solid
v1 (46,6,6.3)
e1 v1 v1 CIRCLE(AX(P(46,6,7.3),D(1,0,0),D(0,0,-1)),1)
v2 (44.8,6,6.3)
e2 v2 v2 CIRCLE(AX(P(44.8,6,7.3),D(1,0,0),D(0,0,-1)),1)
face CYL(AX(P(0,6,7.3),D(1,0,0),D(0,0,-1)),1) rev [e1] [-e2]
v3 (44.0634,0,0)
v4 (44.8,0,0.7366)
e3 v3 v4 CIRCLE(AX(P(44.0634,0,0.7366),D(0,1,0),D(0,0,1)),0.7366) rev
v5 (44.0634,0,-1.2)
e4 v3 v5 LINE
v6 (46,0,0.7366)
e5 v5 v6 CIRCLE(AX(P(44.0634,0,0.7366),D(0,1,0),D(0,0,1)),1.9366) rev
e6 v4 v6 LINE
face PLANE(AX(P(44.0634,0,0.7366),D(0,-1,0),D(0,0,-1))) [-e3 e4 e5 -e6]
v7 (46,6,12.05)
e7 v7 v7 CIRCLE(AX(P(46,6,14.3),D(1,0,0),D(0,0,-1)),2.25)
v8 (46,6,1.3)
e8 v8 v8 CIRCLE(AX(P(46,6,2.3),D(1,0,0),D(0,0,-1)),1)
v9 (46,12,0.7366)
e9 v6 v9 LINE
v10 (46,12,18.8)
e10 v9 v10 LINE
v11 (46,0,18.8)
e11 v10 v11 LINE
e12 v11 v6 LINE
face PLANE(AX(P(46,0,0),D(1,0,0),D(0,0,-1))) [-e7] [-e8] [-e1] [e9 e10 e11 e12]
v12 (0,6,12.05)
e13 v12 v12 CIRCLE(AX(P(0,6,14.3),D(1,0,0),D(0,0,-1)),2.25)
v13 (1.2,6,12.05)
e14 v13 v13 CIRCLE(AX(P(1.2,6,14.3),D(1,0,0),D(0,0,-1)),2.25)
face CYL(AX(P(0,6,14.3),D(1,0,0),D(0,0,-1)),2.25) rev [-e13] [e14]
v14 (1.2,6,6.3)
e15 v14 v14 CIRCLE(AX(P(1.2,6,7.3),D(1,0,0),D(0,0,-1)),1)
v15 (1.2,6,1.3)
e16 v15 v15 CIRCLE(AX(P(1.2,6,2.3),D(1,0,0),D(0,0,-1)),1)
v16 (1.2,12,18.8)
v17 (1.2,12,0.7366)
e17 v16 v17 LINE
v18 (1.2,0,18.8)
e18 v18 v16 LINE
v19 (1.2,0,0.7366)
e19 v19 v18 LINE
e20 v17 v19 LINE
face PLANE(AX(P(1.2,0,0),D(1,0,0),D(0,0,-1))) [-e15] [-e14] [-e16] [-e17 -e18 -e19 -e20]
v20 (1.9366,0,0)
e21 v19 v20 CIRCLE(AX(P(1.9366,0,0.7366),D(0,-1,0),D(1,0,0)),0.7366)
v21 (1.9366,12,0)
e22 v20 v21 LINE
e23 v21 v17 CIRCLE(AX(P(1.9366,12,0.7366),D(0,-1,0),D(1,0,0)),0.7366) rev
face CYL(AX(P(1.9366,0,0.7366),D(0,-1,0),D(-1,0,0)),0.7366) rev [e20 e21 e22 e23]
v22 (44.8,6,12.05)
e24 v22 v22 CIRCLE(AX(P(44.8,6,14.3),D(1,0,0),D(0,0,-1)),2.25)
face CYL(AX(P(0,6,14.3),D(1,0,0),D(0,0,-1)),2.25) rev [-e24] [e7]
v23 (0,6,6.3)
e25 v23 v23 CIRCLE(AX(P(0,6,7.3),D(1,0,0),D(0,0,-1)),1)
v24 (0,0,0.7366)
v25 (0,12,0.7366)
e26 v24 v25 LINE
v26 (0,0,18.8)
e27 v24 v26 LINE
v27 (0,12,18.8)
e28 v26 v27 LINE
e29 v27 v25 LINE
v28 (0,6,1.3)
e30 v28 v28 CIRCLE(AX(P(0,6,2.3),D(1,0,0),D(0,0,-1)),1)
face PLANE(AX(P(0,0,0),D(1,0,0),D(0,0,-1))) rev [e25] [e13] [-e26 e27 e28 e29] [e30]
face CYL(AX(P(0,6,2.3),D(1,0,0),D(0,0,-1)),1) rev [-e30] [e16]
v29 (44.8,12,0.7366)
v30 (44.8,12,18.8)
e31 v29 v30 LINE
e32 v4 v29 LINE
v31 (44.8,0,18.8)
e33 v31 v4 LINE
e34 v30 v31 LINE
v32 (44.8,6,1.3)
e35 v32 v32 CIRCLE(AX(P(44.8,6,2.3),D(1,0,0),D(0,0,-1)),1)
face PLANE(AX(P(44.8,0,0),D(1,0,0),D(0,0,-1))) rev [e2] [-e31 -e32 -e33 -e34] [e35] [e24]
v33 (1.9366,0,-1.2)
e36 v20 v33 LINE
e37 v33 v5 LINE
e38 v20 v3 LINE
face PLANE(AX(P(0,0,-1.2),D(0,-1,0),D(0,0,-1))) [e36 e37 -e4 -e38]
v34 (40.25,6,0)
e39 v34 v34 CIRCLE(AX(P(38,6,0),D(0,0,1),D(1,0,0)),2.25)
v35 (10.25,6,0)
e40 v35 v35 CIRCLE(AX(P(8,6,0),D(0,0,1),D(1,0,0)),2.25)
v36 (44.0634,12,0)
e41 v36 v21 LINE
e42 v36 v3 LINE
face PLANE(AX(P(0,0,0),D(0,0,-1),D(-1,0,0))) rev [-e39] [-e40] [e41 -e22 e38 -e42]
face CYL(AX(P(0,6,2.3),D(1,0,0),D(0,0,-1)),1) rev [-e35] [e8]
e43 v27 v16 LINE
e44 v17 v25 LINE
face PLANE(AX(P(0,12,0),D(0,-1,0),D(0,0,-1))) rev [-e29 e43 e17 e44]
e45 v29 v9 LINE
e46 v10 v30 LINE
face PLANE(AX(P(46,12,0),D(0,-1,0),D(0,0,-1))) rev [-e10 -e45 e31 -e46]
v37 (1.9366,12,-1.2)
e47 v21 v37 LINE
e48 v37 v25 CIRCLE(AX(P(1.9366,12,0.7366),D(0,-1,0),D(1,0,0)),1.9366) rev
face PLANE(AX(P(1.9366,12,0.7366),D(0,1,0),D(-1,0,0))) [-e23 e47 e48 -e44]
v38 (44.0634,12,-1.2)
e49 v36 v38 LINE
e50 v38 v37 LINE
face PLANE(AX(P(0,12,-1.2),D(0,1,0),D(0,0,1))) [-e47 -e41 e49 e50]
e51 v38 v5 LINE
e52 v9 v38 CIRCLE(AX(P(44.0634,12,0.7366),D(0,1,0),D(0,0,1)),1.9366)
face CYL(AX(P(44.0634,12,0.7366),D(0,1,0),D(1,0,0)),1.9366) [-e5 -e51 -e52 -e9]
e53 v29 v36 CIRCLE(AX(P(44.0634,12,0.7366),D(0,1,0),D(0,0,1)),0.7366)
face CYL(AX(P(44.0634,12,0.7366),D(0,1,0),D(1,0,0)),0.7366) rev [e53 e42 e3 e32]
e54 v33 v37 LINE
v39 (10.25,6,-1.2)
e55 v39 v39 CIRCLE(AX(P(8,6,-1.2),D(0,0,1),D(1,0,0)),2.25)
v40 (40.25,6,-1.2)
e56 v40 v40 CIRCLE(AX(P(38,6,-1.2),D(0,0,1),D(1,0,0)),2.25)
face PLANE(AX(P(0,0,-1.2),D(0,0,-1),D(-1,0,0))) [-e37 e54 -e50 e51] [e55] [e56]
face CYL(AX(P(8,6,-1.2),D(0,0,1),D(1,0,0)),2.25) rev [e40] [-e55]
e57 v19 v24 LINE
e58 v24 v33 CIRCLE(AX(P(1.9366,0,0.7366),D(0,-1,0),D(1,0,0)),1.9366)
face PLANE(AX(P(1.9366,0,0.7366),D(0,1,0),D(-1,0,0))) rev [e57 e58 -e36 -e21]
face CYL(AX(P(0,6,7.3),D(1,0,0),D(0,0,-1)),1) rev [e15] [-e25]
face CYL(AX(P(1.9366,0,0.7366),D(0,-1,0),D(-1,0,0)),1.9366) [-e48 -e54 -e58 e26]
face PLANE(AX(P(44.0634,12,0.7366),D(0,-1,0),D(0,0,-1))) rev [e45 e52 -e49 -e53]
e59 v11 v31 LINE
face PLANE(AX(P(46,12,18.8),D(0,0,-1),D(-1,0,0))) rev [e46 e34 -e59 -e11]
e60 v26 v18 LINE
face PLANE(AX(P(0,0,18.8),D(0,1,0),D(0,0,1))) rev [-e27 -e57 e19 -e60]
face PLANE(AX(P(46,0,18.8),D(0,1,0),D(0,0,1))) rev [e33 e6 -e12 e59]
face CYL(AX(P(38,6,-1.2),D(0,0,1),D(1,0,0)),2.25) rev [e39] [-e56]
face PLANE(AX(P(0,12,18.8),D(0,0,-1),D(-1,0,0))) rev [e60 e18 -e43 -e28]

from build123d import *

# Parameters (mm, degrees)
SKETCH_1_W                         = 46
SKETCH_1_H                         = 12
SKETCH_1_R                         = 2.25
SM_BASE_FLANGE_1_DEPTH             = 1.2
SM_EDGE_FLANGE_1_STRIP_W           = 6.2732
SM_EDGE_FLANGE_1_STRIP_H           = 1.2
SM_EDGE_FLANGE_1_STRIP_CUT_DEPTH   = 12
SM_EDGE_FLANGE_1_STRIP_2_W         = 6.2732
SM_EDGE_FLANGE_1_STRIP_2_H         = 1.2
SM_EDGE_FLANGE_1_STRIP_CUT_2_DEPTH = 12
SM_EDGE_FLANGE_1_DEPTH             = 12
SM_EDGE_FLANGE_1_BEND_DEPTH        = 12
SKETCH_12_R                        = 2.25
SKETCH_12_R_2                      = 1
CUT_EXTRUDE_1_DEPTH                = 52.121815304


# Sheet-metal steps are written as plain solids
with BuildPart() as part:
    # Sketch 1 → Базовая кромка1 (new body)
    with BuildSketch(Plane.XY):
        with Locations((23, 6)):
            Rectangle(SKETCH_1_W, SKETCH_1_H)
        with Locations((8, 6)):
            Circle(SKETCH_1_R, mode=Mode.SUBTRACT)
        with Locations((38, 6)):
            Circle(SKETCH_1_R, mode=Mode.SUBTRACT)
    extrude(amount=-SM_BASE_FLANGE_1_DEPTH)

    # Ребро-кромка1 strip (across the edge) → Ребро-кромка1 strip cut (cut)
    with BuildSketch(Plane.XZ.offset(-12)):
        with Locations((-1.2, -0.6)):
            Rectangle(SM_EDGE_FLANGE_1_STRIP_W, SM_EDGE_FLANGE_1_STRIP_H)
    extrude(amount=SM_EDGE_FLANGE_1_STRIP_CUT_DEPTH, mode=Mode.SUBTRACT)

    # Ребро-кромка1 strip 2 (across the edge) → Ребро-кромка1 strip cut 2 (cut)
    with BuildSketch(Plane(origin=(46, 0, 0), x_dir=(-1, 0, 0), z_dir=(0, 1, 0))):
        with Locations((-1.2, -0.6)):
            Rectangle(SM_EDGE_FLANGE_1_STRIP_2_W, SM_EDGE_FLANGE_1_STRIP_2_H)
    extrude(amount=SM_EDGE_FLANGE_1_STRIP_CUT_2_DEPTH, mode=Mode.SUBTRACT)

    # Ребро-кромка1 section (across the edge) → Ребро-кромка1 (add)
    with BuildSketch(Plane.XZ.offset(-12)):
        with BuildLine():
            Line((0, 0.7366), (0, 18.8))
            Line((0, 18.8), (1.2, 18.8))
            Line((1.2, 18.8), (1.2, 0.7366))
            ThreePointArc((1.2, 0.7366), (1.415745145, 0.215745145), (1.9366, 0))
            Line((1.9366, 0), (1.9366, -1.2))
            ThreePointArc((1.9366, -1.2), (0.567217008, -0.632782992), (0, 0.7366))
        make_face()
    extrude(amount=SM_EDGE_FLANGE_1_DEPTH)

    # Ребро-кромка1 section 2 (across the edge) → Ребро-кромка1 bend (add)
    with BuildSketch(Plane(origin=(46, 0, 0), x_dir=(-1, 0, 0), z_dir=(0, 1, 0))):
        with BuildLine():
            Line((0, 0.7366), (0, 18.8))
            Line((0, 18.8), (1.2, 18.8))
            Line((1.2, 18.8), (1.2, 0.7366))
            ThreePointArc((1.2, 0.7366), (1.415745145, 0.215745145), (1.9366, 0))
            Line((1.9366, 0), (1.9366, -1.2))
            ThreePointArc((1.9366, -1.2), (0.567217008, -0.632782992), (0, 0.7366))
        make_face()
    extrude(amount=SM_EDGE_FLANGE_1_BEND_DEPTH)

    # Эскиз12 → Вырез-Вытянуть1 (cut, through all)
    with BuildSketch(Plane(origin=(46, 0, 0), x_dir=(0, 0, -1), z_dir=(1, 0, 0))):
        with Locations((-14.3, 6)):
            Circle(SKETCH_12_R)
        with Locations((-7.3, 6)):
            Circle(SKETCH_12_R_2)
        with Locations((-2.3, 6)):
            Circle(SKETCH_12_R_2)
    extrude(amount=-CUT_EXTRUDE_1_DEPTH, mode=Mode.SUBTRACT)


solid = part.part
